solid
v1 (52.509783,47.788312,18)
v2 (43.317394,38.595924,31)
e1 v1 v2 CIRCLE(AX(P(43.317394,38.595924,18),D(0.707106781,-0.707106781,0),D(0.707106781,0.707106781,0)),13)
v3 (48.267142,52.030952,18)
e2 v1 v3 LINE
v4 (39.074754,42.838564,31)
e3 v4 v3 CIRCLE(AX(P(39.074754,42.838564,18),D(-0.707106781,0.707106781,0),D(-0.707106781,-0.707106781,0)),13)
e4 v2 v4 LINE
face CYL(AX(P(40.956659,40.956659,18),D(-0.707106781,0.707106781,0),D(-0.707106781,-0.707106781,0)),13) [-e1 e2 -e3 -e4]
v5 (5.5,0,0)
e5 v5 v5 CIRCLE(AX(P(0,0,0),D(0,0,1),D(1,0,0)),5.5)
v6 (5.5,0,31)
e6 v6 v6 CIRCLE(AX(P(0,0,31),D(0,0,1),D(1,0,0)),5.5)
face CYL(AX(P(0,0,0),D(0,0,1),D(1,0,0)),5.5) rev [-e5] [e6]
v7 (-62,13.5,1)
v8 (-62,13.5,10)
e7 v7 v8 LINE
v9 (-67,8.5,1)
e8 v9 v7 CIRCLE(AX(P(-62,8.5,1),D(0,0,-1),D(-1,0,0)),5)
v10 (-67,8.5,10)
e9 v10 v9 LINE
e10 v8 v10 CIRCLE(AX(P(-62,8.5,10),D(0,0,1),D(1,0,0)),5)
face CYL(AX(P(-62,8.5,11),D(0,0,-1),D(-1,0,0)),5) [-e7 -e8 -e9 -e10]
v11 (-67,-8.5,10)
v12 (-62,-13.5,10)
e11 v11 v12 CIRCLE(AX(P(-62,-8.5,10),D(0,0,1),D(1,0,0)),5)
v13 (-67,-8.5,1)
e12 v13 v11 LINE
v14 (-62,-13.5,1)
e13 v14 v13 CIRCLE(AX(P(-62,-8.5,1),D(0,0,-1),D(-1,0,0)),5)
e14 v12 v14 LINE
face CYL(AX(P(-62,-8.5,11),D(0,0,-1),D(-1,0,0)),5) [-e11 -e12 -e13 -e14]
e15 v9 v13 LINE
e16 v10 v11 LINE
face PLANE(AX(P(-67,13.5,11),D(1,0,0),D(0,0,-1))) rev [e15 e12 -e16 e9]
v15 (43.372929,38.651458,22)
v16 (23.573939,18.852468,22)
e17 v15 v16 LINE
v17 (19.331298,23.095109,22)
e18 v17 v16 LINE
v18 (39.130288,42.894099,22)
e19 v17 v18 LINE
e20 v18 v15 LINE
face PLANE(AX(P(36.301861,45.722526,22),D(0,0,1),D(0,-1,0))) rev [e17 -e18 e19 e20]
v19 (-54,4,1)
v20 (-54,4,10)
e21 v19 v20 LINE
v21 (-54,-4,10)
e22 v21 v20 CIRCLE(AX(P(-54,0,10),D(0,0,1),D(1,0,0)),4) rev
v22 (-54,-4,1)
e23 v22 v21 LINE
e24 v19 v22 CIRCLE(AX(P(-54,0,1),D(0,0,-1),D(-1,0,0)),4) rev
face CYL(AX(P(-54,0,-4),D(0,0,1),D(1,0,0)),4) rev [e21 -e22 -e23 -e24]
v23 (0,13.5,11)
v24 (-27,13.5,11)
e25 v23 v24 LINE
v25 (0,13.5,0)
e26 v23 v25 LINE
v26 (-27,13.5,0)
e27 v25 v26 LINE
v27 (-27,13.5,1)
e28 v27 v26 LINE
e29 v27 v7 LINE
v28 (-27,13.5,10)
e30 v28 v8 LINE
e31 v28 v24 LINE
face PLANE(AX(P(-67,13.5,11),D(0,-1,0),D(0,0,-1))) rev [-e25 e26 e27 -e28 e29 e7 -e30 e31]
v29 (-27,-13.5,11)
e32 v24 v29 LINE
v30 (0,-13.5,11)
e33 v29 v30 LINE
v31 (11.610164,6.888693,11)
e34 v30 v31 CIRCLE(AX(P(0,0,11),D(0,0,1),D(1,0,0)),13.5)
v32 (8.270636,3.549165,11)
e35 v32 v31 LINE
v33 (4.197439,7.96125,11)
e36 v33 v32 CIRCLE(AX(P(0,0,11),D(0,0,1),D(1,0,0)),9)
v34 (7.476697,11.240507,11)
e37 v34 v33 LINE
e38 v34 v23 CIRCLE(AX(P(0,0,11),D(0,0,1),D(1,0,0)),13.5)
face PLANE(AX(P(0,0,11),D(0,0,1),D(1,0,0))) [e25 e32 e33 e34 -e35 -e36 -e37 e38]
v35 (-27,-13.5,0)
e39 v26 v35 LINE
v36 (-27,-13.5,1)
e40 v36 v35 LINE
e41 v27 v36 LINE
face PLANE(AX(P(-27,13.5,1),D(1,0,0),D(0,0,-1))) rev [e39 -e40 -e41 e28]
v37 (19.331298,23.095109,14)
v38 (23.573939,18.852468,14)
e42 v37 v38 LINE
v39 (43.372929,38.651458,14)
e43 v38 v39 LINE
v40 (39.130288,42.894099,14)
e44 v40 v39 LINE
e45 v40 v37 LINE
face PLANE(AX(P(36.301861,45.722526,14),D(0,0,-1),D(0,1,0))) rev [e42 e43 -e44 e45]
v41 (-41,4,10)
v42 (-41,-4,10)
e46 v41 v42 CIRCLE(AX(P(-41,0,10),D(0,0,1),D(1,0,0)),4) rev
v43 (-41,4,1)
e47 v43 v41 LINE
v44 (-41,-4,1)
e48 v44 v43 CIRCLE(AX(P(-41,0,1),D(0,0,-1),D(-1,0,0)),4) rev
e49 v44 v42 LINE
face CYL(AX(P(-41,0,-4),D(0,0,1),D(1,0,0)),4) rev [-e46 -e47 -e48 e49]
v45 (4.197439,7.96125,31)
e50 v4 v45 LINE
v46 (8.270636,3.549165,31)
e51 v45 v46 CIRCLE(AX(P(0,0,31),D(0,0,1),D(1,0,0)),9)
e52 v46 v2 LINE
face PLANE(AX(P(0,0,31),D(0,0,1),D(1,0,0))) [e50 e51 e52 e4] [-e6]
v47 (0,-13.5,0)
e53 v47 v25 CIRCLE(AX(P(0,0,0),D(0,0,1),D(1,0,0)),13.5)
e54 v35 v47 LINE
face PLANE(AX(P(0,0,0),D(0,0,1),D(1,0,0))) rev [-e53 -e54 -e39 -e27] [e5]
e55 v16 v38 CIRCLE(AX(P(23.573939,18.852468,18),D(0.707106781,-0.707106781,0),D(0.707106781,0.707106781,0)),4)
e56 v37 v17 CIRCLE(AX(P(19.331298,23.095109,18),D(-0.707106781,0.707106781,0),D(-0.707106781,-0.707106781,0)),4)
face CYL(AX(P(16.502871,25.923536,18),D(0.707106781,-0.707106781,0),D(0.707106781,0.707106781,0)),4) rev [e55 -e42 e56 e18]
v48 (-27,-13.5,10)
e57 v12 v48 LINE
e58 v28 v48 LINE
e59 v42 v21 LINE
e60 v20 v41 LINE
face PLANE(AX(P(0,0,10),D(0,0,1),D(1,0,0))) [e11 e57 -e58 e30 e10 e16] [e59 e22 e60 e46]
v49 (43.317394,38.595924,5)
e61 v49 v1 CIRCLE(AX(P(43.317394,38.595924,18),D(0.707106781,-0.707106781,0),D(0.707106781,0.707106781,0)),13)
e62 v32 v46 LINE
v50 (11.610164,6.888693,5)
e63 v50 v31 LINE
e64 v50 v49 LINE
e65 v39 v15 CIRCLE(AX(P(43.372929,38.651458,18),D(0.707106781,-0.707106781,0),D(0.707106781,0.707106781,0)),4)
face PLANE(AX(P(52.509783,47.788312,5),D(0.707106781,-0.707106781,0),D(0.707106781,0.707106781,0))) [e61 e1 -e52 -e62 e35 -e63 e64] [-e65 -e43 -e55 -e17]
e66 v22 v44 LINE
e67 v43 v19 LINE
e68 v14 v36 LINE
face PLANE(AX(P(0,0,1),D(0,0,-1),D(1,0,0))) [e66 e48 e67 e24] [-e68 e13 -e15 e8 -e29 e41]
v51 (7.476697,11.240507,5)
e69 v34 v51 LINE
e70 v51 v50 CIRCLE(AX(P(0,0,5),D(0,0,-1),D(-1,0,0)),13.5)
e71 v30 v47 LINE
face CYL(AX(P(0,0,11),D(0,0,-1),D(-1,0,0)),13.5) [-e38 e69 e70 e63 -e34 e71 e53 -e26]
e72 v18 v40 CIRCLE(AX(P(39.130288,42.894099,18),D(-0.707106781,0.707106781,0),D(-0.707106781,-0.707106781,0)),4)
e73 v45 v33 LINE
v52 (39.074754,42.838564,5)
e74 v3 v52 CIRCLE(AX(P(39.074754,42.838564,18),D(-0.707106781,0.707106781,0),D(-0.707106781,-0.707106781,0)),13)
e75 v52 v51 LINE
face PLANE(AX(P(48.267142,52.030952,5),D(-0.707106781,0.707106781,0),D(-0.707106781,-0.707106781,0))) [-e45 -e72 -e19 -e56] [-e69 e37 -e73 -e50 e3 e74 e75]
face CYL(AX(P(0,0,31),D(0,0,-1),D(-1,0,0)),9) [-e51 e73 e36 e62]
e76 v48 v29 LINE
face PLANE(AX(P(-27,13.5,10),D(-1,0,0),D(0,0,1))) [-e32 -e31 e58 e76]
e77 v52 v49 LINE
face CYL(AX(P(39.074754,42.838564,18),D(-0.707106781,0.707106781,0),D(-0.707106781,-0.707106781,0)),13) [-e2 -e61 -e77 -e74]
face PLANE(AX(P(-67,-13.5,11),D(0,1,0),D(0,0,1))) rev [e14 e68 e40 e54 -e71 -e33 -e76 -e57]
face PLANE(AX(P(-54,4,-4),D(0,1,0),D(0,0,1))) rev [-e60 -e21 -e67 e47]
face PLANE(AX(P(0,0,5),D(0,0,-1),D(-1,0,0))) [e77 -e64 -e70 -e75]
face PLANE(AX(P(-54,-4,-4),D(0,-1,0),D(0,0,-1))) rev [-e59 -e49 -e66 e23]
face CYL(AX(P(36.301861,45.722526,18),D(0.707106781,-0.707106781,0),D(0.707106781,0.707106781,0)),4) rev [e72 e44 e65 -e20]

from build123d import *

# Parameters (mm, degrees)
EXTRUDE_1_DEPTH     = 11
CUT_EXTRUDE_1_DEPTH = 15
SKETCH_3_R          = 9
EXTRUDE_2_DEPTH     = 20
SKETCH_4_W          = 40
SKETCH_4_H          = 27
CUT_EXTRUDE_2_DEPTH = 1
SKETCH_6_R          = 5.5
CUT_EXTRUDE_3_DEPTH = 76.048317769
EXTRUDE_3_DEPTH     = 26
FILLET_1_R          = 13
FILLET_2_R          = 5
CUT_EXTRUDE_4_DEPTH = 10


with BuildPart() as part:
    # 스케치1 → 보스-돌출1 (new body)
    with BuildSketch(Plane.XY):
        with BuildLine():
            Line((-67, 13.5), (0, 13.5))
            ThreePointArc((0, 13.5), (13.5, 0), (0, -13.5))
            Line((0, -13.5), (-67, -13.5))
            Line((-67, -13.5), (-67, 13.5))
        make_face()
    extrude(amount=EXTRUDE_1_DEPTH)

    # 스케치2 → 컷-돌출1 (cut)
    with BuildSketch(Plane.XY.offset(11)):
        with BuildLine():
            Line((-54, 4), (-41, 4))
            ThreePointArc((-41, 4), (-37, 0), (-41, -4))
            Line((-41, -4), (-54, -4))
            ThreePointArc((-54, -4), (-58, 0), (-54, 4))
        make_face()
    extrude(amount=-CUT_EXTRUDE_1_DEPTH, mode=Mode.SUBTRACT)

    # 스케치3 → 보스-돌출2 (add)
    with BuildSketch(Plane.XY.offset(11)):
        Circle(SKETCH_3_R)
    extrude(amount=EXTRUDE_2_DEPTH)

    # 스케치4 → 컷-돌출2 (cut)
    with BuildSketch(Plane.XY.offset(11)):
        with Locations((-47, 0)):
            Rectangle(SKETCH_4_W, SKETCH_4_H)
    cut_extrude_2 = extrude(amount=-CUT_EXTRUDE_2_DEPTH, mode=Mode.SUBTRACT)

    # 대칭 복사1: 컷-돌출2 across plane
    add(cut_extrude_2.mirror(Plane.XY.offset(5.5)), mode=Mode.SUBTRACT)

    # 스케치6 → 컷-돌출3 (cut, through all)
    with BuildSketch(Plane.XY.offset(31)):
        Circle(SKETCH_6_R)
    extrude(amount=-CUT_EXTRUDE_3_DEPTH, mode=Mode.SUBTRACT)

    # 스케치8 → 보스-돌출3 (add)
    with BuildSketch(Plane.XY.offset(31)):
        Polygon((48.267141866, 52.030952398), (3.01230787, 6.776118402), (7.254948557, 2.533477715), (52.509782553, 47.788311711), align=None)
    extrude(amount=-EXTRUDE_3_DEPTH)

    # 필렛1
    fillet_1_edges = [part.edges().sort_by_distance(p)[0] for p in [
        (50.38846221, 49.909632055, 31),
        (50.38846221, 49.909632055, 5),
    ]]
    fillet(fillet_1_edges, radius=FILLET_1_R - 0.0001)  # a hair under: the kernel refuses the full size

    # 필렛2
    fillet_2_edges = [part.edges().sort_by_distance(p)[0] for p in [
        (-67, -13.5, 5.5),
        (-67, 13.5, 5.5),
    ]]
    fillet(fillet_2_edges, radius=FILLET_2_R)

    # 스케치11 → 컷-돌출4 (cut)
    with BuildSketch(Plane(origin=(2.360735421, -2.360735421, 0), x_dir=(0, 0, -1), z_dir=(0.7071067811865477, -0.7071067811865475, 0))):
        with BuildLine():
            Line((-14, 58), (-14, 30))
            ThreePointArc((-14, 30), (-18, 26), (-22, 30))
            Line((-22, 30), (-22, 58))
            ThreePointArc((-22, 58), (-18, 62), (-14, 58))
        make_face()
    extrude(amount=-CUT_EXTRUDE_4_DEPTH, mode=Mode.SUBTRACT)


solid = part.part
